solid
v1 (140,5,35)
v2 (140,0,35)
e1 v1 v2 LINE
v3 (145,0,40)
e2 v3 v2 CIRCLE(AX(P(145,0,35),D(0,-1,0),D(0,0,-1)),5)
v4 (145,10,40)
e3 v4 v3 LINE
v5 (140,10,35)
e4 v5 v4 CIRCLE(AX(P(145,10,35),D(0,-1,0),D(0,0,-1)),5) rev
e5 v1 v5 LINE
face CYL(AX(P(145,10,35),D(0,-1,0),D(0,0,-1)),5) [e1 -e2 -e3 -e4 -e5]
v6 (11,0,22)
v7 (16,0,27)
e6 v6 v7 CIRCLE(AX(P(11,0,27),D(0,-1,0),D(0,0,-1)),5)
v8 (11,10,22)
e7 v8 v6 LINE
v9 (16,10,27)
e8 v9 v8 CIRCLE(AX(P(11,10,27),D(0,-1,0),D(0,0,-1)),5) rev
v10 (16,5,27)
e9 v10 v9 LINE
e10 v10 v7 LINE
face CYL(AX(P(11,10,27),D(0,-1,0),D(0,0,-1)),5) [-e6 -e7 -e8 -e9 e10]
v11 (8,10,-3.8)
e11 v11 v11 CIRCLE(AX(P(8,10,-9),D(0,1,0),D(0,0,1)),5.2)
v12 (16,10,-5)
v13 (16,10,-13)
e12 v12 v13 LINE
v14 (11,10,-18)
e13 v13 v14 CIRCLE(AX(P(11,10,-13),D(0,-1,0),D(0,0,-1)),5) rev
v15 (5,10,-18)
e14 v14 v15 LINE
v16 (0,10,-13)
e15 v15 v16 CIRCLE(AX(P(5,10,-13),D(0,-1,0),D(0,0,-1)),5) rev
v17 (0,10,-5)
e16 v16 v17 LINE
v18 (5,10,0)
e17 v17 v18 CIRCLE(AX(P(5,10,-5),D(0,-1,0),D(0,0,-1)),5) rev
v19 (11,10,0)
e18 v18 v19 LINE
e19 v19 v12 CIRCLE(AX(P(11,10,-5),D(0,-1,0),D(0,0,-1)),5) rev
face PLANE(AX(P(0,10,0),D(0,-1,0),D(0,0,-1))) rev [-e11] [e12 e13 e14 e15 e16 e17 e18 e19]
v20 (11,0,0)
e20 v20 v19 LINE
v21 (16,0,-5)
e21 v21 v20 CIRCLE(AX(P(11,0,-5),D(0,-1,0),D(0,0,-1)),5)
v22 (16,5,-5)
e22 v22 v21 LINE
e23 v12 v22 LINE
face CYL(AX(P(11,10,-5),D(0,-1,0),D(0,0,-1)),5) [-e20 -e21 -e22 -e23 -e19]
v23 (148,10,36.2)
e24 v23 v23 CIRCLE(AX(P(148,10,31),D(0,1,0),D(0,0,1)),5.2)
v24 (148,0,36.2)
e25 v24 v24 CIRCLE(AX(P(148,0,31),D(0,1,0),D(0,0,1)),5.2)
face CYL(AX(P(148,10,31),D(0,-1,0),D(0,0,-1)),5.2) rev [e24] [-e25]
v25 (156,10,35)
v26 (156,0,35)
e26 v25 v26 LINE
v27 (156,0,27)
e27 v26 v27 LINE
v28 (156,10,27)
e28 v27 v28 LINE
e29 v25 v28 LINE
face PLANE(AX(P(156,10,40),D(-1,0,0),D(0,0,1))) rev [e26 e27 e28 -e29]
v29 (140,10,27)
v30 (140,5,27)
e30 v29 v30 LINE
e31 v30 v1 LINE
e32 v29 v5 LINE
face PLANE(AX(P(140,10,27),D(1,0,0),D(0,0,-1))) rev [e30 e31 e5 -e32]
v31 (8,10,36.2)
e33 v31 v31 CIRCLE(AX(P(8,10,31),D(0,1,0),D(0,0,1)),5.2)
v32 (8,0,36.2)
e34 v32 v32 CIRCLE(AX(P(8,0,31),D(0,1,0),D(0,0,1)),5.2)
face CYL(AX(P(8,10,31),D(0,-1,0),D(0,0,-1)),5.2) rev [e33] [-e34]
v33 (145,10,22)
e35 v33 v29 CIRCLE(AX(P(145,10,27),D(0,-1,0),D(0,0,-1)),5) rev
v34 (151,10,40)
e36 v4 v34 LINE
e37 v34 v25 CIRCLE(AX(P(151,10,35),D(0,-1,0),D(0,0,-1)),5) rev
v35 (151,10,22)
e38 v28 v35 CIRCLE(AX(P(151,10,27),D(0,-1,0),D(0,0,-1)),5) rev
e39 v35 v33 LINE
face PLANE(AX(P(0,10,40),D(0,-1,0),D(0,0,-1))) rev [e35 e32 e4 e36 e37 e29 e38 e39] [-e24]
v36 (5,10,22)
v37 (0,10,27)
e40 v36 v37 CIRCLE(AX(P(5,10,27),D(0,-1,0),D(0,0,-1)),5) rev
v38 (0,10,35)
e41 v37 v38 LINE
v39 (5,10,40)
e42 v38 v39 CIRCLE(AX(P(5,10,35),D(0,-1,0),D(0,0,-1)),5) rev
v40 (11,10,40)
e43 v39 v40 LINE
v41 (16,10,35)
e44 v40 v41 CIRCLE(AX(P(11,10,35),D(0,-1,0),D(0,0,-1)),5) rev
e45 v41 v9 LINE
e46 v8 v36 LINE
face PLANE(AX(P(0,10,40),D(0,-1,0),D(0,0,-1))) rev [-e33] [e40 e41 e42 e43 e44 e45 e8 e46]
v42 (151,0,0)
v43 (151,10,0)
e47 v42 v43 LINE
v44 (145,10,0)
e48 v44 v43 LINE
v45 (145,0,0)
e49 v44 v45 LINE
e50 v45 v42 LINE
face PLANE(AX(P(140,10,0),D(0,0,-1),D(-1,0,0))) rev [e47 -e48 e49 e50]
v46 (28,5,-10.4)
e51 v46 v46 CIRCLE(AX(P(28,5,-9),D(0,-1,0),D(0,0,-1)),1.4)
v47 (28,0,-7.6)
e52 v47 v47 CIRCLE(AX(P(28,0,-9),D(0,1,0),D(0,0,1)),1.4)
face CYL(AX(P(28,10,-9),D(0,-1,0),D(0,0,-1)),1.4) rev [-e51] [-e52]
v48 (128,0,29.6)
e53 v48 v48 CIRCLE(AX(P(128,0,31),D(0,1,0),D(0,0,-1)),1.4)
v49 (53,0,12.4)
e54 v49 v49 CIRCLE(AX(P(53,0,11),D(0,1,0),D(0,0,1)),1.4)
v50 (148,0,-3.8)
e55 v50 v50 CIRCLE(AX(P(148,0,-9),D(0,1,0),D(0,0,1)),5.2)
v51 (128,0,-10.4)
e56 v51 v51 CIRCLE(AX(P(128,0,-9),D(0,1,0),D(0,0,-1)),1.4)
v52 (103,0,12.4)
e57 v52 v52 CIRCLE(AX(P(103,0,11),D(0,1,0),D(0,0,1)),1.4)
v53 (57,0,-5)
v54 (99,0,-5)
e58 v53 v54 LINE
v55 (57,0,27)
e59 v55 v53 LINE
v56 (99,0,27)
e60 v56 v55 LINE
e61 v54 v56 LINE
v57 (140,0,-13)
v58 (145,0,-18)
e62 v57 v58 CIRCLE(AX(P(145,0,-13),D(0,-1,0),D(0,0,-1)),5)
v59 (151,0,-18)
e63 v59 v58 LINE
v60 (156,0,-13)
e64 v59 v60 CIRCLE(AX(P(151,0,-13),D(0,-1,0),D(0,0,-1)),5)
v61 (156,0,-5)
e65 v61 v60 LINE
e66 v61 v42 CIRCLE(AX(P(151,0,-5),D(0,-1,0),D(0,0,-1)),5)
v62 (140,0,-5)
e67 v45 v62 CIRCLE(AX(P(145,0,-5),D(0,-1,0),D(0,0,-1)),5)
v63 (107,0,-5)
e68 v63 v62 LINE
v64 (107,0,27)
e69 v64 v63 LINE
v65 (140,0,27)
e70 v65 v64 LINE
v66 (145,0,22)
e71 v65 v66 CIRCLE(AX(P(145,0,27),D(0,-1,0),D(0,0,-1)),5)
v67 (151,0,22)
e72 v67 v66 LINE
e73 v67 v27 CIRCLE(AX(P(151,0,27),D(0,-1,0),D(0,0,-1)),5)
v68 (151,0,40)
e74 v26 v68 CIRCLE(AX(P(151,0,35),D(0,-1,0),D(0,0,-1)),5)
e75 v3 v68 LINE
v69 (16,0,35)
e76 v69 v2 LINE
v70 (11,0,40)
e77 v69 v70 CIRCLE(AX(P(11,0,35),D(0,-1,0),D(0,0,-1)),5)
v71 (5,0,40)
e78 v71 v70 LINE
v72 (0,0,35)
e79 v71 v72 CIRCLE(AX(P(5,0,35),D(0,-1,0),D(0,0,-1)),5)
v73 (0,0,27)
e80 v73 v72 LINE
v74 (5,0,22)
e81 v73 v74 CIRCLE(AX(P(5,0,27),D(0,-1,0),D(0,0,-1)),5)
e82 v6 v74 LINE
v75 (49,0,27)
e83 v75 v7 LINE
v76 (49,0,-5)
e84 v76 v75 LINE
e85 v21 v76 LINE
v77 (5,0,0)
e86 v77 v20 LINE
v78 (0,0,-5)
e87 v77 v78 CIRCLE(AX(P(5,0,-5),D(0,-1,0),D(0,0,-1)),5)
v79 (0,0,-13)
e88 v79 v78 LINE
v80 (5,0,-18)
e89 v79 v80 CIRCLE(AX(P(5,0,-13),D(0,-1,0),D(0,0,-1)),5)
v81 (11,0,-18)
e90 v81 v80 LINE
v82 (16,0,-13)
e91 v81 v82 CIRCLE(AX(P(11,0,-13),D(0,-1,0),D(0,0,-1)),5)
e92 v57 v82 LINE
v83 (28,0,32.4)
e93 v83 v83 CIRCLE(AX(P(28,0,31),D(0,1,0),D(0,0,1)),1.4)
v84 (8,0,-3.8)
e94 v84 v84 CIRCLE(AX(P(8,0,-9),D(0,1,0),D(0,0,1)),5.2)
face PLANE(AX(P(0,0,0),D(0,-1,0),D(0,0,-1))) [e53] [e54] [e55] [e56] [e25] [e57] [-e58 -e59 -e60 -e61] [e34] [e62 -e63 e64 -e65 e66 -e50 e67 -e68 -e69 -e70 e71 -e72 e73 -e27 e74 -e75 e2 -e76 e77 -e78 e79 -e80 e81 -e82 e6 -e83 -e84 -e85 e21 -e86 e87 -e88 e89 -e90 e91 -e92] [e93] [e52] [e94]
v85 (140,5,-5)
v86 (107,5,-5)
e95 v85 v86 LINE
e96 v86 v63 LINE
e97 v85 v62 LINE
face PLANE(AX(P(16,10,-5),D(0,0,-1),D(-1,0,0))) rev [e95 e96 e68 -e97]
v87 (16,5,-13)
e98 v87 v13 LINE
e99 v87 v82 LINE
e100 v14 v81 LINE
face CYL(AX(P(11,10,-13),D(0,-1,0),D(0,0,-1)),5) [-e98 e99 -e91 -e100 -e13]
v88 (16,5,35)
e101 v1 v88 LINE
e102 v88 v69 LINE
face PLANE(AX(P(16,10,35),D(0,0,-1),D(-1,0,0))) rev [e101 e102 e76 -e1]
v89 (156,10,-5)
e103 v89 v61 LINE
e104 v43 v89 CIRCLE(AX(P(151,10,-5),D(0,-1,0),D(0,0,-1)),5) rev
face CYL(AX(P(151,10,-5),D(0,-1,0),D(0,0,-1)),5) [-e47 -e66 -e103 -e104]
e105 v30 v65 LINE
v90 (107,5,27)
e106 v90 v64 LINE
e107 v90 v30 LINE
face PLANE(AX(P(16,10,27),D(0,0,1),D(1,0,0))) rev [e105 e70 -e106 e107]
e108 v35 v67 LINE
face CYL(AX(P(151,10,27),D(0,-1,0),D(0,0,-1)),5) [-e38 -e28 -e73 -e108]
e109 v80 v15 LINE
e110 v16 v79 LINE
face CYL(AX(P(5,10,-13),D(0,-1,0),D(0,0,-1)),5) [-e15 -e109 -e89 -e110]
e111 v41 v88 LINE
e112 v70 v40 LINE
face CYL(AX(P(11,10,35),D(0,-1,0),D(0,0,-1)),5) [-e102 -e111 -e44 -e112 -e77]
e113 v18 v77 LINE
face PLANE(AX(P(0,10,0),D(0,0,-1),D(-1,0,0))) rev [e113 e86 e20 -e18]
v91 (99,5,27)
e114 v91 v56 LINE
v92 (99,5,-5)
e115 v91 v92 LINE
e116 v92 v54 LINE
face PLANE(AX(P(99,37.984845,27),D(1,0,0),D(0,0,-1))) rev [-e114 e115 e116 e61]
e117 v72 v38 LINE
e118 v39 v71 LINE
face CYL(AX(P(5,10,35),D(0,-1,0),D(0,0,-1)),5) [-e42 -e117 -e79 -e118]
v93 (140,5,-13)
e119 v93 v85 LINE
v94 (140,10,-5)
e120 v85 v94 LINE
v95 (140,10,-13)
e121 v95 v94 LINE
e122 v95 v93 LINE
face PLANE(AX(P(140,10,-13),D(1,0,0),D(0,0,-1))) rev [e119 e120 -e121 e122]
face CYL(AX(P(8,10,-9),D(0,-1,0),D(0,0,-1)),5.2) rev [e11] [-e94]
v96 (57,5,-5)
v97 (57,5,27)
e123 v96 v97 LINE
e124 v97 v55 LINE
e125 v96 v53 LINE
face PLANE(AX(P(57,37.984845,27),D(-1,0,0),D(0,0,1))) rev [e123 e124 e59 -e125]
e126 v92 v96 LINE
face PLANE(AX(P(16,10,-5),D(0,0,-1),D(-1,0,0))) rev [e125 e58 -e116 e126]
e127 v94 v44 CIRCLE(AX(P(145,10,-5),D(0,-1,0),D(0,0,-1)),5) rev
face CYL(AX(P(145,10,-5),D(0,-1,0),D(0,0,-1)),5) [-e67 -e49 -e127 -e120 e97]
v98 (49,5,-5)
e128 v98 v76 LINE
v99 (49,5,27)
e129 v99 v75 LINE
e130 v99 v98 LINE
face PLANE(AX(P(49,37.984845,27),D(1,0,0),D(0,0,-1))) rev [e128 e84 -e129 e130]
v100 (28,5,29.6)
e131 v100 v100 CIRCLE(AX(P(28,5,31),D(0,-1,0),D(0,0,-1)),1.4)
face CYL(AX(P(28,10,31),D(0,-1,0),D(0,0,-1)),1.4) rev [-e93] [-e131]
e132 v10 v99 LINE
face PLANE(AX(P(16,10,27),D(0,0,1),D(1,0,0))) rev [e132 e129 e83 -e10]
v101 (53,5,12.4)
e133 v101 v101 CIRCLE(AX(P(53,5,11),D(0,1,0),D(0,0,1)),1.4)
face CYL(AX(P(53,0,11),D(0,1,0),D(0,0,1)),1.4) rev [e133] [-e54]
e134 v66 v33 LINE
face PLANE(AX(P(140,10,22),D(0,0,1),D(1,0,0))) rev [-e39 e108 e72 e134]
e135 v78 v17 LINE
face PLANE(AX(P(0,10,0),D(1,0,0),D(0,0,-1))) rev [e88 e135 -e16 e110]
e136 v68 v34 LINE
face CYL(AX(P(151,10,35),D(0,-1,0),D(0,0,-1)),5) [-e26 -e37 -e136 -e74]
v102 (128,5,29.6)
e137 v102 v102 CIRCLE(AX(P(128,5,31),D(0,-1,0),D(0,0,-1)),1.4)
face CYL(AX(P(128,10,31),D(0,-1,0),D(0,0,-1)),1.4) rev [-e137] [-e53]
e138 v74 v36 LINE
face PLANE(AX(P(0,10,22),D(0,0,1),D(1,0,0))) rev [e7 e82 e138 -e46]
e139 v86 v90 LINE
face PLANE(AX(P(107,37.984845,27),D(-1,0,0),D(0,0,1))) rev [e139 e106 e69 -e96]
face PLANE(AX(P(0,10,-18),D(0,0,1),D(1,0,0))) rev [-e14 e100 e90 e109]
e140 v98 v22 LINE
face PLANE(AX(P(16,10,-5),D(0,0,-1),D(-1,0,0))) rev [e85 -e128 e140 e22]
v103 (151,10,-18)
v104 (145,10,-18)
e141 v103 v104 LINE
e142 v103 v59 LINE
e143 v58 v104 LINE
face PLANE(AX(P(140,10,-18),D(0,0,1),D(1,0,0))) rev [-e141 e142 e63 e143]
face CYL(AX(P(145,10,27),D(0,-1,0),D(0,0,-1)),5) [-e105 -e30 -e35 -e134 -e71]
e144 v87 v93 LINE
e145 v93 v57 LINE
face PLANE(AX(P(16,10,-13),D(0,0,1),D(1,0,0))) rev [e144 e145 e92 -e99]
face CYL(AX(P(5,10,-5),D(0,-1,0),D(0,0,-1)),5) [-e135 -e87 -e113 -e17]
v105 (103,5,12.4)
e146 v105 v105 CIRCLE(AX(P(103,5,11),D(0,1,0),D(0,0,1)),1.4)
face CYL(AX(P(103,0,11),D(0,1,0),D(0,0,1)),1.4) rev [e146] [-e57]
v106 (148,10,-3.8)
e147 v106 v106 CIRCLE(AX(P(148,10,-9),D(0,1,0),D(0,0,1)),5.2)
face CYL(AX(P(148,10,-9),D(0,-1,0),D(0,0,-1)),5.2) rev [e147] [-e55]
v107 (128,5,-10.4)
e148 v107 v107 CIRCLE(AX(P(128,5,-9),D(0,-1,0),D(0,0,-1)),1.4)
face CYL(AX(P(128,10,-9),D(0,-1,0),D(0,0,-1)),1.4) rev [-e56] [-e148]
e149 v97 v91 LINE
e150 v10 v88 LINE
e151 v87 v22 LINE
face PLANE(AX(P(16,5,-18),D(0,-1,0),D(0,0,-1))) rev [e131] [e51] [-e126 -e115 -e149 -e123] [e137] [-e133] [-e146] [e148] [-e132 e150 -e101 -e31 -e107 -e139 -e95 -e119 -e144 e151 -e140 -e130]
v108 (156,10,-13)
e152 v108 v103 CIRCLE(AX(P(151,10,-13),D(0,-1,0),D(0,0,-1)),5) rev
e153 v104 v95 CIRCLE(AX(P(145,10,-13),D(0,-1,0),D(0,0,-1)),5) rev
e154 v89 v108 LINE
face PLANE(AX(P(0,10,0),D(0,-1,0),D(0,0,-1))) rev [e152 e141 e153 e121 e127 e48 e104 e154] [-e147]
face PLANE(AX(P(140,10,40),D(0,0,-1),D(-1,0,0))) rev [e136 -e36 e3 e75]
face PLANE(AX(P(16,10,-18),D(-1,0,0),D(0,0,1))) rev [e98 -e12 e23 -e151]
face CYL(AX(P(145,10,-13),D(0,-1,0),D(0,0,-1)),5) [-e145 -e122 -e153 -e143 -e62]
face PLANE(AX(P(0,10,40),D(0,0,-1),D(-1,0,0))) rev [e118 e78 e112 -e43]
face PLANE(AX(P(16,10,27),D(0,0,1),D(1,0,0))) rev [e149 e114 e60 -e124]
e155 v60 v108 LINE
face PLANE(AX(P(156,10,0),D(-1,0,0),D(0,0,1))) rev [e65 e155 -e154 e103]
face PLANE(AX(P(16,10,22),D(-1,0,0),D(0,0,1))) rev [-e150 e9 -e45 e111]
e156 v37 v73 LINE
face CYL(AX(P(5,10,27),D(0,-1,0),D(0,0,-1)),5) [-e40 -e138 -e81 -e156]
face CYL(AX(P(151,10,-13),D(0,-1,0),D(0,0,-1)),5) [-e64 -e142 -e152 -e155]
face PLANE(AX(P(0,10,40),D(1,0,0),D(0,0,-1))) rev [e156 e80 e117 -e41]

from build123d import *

# Parameters (mm, degrees)
SKETCH1_R           = 5.2
SKETCH1_R_2         = 1.4
BOSS_EXTRUDE1_DEPTH = 10
SKETCH2_W           = 124
SKETCH2_H           = 5
CUT_EXTRUDE1_DEPTH  = 158.353106102
FILLET1_R           = 5
SKETCH3_W           = 8
SKETCH3_H           = 32
BOSS_EXTRUDE2_DEPTH = 5
SKETCH4_R           = 1.4
CUT_EXTRUDE2_DEPTH  = 162.124175716


with BuildPart() as part:
    # Sketch1 → Boss-Extrude1 (new body)
    with BuildSketch(Plane(origin=(0, 0, 0), x_dir=(1, 0, 0), z_dir=(0, 1, 0))):
        Polygon((0, 0), (16, 0), (16, 5), (140, 5), (140, 0), (156, 0), (156, 18), (140, 18), (140, 13), (16, 13), (16, 18), (0, 18), align=None)
        with Locations(Location((8, 9, 0), (0, 0, 270))):
            Circle(SKETCH1_R, mode=Mode.SUBTRACT)
        with Locations(Location((148, 9, 0), (0, 0, 270))):
            Circle(SKETCH1_R, mode=Mode.SUBTRACT)
        with Locations(Location((28, 9, 0), (0, 0, 270))):
            Circle(SKETCH1_R_2, mode=Mode.SUBTRACT)
        with Locations(Location((128, 9, 0), (0, 0, 90))):
            Circle(SKETCH1_R_2, mode=Mode.SUBTRACT)
    extrude(amount=BOSS_EXTRUDE1_DEPTH)

    # Sketch2 → Cut-Extrude1 (cut, through all)
    with BuildSketch(Plane.XY):
        with Locations((78, 7.5)):
            Rectangle(SKETCH2_W, SKETCH2_H)
    extrude(amount=-CUT_EXTRUDE1_DEPTH, mode=Mode.SUBTRACT)

    # Fillet1
    fillet1_edges = [part.edges().sort_by_distance(p)[0] for p in [
        (140, 5, 0),
        (156, 5, 0),
        (156, 5, -18),
        (140, 5, -18),
        (0, 5, 0),
        (0, 5, -18),
        (16, 5, -18),
        (16, 5, 0),
    ]]
    fillet(fillet1_edges, radius=FILLET1_R - 0.0001)  # a hair under: the kernel refuses the full size


with BuildPart() as body_2:
    # Body-Move/Copy1: copy of part
    add(part.part.moved(Location((0, 0, 40))))


with BuildPart() as part_1:
    add(part.part)

    add(body_2.part)  # Boss-Extrude2 merges body 2
    # Sketch3 → Boss-Extrude2 (add)
    with BuildSketch(Plane(origin=(0, 0, 0), x_dir=(1, 0, 0), z_dir=(0, 1, 0))):
        with Locations((53, -11)):
            Rectangle(SKETCH3_W, SKETCH3_H)
        with Locations((103, -11)):
            Rectangle(SKETCH3_W, SKETCH3_H)
    extrude(amount=BOSS_EXTRUDE2_DEPTH)

    # Sketch4 → Cut-Extrude2 (cut, through all)
    with BuildSketch(Plane(origin=(0, 5, 0), x_dir=(1, 0, 0), z_dir=(0, 1, 0))):
        with Locations(Location((53, -11, 0), (0, 0, 270))):
            Circle(SKETCH4_R)
        with Locations(Location((103, -11, 0), (0, 0, 270))):
            Circle(SKETCH4_R)
    extrude(amount=-CUT_EXTRUDE2_DEPTH, mode=Mode.SUBTRACT)


solid = part_1.part
